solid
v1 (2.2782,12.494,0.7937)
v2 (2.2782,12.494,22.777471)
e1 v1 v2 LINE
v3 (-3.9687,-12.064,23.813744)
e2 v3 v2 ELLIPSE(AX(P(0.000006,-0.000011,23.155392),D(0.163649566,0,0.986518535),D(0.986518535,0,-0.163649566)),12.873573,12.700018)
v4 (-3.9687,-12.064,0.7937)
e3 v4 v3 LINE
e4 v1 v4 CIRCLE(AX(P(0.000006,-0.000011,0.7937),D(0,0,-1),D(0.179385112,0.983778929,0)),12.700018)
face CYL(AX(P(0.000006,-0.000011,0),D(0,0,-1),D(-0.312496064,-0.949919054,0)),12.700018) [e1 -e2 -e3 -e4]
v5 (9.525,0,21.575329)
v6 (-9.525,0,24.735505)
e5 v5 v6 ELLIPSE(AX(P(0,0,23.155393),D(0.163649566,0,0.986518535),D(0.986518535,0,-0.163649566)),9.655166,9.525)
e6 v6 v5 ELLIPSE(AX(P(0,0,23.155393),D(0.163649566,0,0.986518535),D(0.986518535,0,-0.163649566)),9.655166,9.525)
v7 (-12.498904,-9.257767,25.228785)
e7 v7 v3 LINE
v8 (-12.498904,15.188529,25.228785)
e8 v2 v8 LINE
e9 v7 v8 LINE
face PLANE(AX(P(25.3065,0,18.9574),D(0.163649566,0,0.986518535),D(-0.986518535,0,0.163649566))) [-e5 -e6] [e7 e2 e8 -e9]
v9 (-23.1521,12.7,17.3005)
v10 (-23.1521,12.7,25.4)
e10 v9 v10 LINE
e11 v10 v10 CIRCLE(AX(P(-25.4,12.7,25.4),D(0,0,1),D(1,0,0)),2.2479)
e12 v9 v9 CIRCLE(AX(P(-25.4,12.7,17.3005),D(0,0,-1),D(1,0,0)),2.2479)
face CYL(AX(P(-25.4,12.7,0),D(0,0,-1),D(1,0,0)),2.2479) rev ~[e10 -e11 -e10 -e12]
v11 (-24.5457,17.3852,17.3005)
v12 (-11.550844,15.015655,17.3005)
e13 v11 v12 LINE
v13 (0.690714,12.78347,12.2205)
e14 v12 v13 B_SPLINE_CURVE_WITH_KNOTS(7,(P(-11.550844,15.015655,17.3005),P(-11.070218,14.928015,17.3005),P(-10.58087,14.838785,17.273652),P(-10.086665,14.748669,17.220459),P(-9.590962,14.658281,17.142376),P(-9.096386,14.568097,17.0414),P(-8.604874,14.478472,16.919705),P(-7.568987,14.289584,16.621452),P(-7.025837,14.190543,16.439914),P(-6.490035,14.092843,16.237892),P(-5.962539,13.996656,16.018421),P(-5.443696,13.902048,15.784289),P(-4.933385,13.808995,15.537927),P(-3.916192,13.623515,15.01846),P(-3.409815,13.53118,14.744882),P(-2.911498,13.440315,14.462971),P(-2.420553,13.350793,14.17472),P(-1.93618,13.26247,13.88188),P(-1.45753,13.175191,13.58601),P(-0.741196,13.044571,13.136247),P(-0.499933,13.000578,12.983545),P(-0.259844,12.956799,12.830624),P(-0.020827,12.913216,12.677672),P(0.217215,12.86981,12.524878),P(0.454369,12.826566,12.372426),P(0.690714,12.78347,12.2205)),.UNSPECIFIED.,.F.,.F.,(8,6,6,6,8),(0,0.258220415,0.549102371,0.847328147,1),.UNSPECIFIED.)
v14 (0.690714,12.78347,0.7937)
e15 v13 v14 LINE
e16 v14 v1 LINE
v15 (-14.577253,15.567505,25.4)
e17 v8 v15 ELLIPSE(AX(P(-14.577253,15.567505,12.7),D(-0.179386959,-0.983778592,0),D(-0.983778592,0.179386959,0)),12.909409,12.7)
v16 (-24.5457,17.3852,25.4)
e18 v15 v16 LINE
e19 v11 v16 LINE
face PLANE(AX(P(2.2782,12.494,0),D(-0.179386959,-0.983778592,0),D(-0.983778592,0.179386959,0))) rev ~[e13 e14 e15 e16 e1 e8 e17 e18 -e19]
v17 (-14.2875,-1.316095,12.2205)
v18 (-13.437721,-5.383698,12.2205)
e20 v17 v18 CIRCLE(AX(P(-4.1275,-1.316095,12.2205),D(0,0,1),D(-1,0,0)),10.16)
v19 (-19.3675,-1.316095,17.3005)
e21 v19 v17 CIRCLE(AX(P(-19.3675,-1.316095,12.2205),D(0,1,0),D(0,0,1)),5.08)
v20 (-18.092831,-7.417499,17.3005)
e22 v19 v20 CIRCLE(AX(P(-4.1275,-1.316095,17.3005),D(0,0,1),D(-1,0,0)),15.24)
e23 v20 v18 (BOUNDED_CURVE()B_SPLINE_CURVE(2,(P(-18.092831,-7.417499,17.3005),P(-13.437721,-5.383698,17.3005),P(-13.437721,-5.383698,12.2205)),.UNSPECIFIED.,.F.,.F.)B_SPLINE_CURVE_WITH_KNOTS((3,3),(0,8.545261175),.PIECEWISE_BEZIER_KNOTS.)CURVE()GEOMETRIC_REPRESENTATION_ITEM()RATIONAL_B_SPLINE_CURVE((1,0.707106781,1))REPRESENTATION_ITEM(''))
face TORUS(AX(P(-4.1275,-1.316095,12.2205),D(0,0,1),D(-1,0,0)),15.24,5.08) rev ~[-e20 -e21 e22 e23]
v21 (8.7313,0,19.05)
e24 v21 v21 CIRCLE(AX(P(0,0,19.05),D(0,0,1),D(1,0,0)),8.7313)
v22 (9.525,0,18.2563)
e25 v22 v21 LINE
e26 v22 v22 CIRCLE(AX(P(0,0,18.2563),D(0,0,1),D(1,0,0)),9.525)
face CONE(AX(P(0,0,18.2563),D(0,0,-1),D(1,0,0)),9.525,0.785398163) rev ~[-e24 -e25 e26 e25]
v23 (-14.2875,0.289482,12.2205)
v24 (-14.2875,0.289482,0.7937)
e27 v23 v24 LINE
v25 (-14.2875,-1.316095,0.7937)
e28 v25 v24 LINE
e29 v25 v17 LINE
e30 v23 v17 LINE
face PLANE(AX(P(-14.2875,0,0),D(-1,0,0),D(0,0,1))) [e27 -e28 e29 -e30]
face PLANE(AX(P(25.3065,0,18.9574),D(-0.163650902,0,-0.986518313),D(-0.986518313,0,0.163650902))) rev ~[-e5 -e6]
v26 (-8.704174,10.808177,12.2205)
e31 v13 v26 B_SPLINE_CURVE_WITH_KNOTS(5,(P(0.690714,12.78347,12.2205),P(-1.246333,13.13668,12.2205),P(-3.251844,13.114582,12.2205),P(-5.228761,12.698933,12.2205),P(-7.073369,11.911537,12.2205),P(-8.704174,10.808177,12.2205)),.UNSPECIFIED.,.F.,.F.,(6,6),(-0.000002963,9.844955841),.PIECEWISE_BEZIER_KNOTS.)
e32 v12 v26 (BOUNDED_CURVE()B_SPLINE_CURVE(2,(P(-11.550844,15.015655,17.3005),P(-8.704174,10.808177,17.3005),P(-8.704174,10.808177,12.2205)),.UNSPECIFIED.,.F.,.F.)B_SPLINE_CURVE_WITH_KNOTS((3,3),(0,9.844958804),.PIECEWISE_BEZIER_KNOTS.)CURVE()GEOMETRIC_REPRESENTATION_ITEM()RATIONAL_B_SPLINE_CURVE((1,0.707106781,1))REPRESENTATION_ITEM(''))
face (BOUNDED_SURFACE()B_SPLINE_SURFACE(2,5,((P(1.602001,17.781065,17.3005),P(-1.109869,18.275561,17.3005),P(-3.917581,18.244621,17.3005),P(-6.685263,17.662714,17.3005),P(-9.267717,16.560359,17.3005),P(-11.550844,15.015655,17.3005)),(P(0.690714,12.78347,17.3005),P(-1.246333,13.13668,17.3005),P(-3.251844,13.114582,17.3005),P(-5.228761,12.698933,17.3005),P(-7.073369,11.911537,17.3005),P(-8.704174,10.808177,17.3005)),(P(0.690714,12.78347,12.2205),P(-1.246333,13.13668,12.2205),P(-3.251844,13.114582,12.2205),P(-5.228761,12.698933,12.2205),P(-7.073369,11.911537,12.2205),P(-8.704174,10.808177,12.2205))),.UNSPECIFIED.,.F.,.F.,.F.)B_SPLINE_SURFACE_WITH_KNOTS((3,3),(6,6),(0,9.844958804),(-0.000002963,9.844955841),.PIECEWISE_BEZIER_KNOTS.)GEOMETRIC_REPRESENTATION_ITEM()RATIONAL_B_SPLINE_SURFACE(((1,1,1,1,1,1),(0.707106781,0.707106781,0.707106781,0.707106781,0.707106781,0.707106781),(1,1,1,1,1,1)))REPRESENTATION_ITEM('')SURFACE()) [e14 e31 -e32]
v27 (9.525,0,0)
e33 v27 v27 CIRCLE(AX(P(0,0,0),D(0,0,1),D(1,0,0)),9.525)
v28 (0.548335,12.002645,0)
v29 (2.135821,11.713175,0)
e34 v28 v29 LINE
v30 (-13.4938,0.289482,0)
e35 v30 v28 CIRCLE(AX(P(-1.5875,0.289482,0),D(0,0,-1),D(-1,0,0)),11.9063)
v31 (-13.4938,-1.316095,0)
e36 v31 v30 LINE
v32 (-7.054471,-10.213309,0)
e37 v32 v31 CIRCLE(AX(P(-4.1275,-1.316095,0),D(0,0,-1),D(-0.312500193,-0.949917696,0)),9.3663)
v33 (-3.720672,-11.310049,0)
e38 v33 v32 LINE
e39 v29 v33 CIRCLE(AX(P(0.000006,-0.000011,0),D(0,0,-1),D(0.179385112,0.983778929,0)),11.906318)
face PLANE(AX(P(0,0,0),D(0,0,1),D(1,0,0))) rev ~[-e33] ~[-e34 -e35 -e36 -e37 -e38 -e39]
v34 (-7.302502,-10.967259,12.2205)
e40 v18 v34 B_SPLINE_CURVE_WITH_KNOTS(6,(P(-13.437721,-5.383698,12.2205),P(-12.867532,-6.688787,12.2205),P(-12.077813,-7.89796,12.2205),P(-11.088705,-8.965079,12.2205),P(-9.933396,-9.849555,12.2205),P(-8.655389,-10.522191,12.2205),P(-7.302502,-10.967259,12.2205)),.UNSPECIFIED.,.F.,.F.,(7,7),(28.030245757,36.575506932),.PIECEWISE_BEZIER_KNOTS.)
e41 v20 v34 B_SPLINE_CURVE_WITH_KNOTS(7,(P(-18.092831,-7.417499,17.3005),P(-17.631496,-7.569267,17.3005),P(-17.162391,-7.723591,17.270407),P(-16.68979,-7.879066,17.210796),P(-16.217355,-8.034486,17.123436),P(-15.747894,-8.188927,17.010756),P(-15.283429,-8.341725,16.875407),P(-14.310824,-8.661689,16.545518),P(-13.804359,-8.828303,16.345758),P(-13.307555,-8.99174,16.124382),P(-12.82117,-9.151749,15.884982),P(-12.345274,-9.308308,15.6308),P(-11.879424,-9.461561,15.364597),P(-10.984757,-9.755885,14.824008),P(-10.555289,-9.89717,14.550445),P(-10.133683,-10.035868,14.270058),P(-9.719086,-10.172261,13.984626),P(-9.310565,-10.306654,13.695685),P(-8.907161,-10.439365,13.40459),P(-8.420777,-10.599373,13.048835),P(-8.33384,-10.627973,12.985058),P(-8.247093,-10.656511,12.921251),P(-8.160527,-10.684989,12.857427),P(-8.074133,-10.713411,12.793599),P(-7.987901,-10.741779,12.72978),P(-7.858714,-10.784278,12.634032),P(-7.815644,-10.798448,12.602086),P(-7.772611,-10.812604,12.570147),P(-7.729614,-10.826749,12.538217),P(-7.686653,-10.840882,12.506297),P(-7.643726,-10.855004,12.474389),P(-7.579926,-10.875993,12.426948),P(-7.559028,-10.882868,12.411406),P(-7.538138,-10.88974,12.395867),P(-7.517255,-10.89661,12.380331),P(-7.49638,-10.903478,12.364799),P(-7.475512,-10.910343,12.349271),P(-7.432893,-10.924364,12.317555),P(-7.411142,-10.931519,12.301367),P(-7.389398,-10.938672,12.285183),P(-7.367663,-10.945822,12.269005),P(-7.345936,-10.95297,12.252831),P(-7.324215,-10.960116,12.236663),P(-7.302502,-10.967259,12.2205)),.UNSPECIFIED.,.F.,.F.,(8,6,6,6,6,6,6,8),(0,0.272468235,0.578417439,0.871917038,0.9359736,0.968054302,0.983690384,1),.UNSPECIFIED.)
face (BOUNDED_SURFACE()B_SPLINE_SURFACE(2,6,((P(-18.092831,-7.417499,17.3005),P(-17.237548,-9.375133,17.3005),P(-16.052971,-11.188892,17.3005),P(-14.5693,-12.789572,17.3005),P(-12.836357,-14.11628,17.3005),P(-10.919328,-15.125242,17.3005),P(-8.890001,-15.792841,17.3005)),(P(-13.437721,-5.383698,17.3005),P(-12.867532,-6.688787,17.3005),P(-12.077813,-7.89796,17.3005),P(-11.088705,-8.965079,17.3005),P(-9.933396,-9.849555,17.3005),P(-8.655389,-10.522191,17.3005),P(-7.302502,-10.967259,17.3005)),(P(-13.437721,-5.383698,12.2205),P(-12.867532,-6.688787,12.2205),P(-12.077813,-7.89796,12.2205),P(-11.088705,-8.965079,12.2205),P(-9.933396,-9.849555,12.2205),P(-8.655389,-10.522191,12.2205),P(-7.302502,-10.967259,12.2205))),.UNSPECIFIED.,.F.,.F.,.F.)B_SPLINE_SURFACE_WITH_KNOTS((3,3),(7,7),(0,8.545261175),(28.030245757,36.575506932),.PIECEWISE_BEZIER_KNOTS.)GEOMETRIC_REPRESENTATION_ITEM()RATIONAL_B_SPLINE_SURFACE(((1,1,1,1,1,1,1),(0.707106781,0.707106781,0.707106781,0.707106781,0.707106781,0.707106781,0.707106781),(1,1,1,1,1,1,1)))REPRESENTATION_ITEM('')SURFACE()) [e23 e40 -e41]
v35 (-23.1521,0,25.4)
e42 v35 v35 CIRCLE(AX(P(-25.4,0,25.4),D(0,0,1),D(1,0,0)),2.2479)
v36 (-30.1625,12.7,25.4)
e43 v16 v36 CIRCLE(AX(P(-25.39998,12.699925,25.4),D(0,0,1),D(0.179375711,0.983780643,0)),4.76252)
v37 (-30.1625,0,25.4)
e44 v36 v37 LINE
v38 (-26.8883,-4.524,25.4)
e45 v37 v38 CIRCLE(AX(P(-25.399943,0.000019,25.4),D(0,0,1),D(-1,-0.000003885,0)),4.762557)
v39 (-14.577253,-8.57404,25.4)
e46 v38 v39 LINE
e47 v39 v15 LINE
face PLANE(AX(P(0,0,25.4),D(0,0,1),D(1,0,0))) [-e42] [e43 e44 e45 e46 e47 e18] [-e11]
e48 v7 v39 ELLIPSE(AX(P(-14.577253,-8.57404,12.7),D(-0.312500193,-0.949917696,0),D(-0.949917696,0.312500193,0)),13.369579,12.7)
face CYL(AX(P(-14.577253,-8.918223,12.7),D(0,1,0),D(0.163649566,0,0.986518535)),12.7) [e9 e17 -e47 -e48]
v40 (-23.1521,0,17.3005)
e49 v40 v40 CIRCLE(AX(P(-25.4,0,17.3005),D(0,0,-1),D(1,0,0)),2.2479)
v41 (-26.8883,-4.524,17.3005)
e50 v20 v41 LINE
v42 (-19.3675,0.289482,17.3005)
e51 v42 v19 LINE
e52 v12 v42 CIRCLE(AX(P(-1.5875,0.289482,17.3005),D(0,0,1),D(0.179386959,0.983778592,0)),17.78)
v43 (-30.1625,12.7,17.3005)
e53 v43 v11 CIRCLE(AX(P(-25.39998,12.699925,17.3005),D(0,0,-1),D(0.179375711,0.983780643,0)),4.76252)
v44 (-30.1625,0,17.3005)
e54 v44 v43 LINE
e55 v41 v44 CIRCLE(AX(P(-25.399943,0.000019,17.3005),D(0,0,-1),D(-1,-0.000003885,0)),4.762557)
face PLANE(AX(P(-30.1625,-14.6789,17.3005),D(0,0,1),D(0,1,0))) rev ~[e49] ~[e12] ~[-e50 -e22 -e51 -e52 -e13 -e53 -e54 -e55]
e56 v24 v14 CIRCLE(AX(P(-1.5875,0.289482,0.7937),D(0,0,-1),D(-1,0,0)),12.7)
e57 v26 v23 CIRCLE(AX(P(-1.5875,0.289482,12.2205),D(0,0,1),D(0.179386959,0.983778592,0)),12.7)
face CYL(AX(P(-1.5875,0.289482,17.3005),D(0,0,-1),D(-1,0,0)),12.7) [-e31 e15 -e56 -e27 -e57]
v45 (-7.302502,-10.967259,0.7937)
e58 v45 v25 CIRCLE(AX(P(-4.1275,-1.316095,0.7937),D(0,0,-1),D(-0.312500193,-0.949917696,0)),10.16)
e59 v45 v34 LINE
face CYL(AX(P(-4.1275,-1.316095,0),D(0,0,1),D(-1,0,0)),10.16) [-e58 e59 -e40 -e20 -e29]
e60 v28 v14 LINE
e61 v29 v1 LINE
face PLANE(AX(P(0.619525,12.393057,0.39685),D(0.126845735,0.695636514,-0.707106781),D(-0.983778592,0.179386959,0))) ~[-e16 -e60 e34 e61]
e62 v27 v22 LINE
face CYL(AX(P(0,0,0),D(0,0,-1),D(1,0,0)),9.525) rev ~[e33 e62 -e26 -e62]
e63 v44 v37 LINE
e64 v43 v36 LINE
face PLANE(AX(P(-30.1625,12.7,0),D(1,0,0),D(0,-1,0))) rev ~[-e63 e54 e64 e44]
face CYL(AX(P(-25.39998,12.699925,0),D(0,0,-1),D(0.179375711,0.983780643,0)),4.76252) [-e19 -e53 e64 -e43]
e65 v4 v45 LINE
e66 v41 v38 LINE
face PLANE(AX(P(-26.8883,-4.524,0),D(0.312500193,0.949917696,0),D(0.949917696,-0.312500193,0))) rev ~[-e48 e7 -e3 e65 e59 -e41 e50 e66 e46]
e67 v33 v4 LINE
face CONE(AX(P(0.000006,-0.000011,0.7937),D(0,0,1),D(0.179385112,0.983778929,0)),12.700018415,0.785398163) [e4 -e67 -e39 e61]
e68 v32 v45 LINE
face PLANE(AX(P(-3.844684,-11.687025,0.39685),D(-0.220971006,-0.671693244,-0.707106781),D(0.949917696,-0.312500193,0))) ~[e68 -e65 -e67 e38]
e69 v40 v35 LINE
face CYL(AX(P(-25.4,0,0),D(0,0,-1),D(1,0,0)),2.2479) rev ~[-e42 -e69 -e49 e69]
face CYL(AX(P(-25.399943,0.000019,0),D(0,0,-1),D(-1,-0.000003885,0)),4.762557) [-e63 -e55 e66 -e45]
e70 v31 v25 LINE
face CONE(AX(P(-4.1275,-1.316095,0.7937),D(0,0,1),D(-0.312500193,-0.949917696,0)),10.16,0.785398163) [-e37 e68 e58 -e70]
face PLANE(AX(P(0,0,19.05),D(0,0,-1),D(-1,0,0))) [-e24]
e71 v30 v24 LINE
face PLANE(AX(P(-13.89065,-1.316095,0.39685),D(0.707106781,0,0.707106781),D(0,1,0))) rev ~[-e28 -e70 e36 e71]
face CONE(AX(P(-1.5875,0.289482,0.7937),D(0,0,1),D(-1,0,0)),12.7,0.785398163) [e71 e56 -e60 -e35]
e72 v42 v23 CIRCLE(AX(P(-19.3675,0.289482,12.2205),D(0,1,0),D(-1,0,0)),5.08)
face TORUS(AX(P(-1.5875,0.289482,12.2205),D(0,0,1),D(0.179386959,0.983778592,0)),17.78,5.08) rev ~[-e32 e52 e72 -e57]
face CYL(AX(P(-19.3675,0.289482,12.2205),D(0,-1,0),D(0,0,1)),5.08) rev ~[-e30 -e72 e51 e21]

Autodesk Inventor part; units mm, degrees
ref_plane "YZ Plane" through (0, 0, 0) normal (1, 0, 0) x (0, 1, 0)
ref_plane "XZ Plane" through (0, 0, 0) normal (0, 1, 0) x (-1, 0, 0)
sketch "Sketch1" plane through (0, 0, 0) normal (0, 0, 1) x (1, 0, 0)
  arc A0 (-3.9687, -12.064) -> (2.2782, 12.494) centre (0, 0) ccw
  circle A1 centre (-25.4, 0) radius 2.2479
  circle A2 centre (-25.4, 12.7) radius 2.2479
  line L0 (-25.4, 0) -> (-25.4, 12.7) construction
  line L1 (0, 0) -> (-25.4, 0) construction
  arc A3 (-24.5457, 17.3852) -> (-30.1625, 12.7) centre (-25.4, 12.7) ccw
  arc A4 (-30.1625, 0) -> (-26.8883, -4.524) centre (-25.4, 0) ccw
  line L2 (-26.8883, -4.524) -> (-3.9687, -12.064)
  line L3 (2.2782, 12.494) -> (-24.5457, 17.3852)
  line L4 (-30.1625, 12.7) -> (-30.1625, 0)
  circle A5 centre (0, 0) radius 9.525
  dimension "d0" = 25.4
  dimension "d1" = 12.7
  dimension "d2" = 4.4958
  dimension "d3" = 25.4
  dimension "d8" = 9.525
  dimension "d9" = 9.525
  dimension "d10" = 19.05
extrude "Extrusion1" add sketch "Sketch1" along normal blind 25.4
sketch "Sketch2" plane through (0, 0, 0) normal (0, 1, 0) x (-1, 0, 0)
  line L0 (-25.3065, 18.9574) -> (19.1186, 26.3269)
  line L1 (19.1186, 26.3269) -> (-25.6271, 26.3269)
  line L2 (-25.6271, 26.3269) -> (-25.3065, 18.9574)
  point P0 (0, 0)
extrude "Extrusion2" cut sketch "Sketch2" along normal through all both and the other way through all
fillet "Fillet1" radius 12.7 1 edges at (-13.531, 3.2293, 25.4)
ref_plane "Work Plane1" through (0, 0, 19.05) normal (0, 0, -1) x (-1, 0, 0)
sketch "Sketch4" plane through (-30.1625, 0, 0) normal (-1, 0, 0) x (0, 0, 1)
  line L0 (17.3005, 18.8893) -> (-1.1849, 18.8893)
  line L1 (-1.1849, 18.8893) -> (-1.1849, -14.6789)
  line L2 (-1.1849, -14.6789) -> (17.3005, -14.6789)
  line L3 (17.3005, -14.6789) -> (17.3005, 18.8893)
  point P0 (0, 0)
extrude "Extrusion4" cut sketch "Sketch4" against normal blind 15.875
fillet "Fillet2" radius 12.7 1 edges at (-14.2875, 15.5147, 8.6503)
fillet "Fillet3" radius 10.16 1 edges at (-14.2875, -8.6693, 8.6503)
fillet "Fillet4" radius 5.08 3 edges at (-12.358, -7.2729, 17.3005) (-9.7225, 10.042, 17.3005) (-14.2875, -0.5133, 17.3005)
sketch "Sketch6" plane through (0, 0, 19.05) normal (0, 0, -1) x (-1, 0, 0)
  circle A0 centre (0, 0) radius 9.525 projected
  arc A1 (7.3025, -10.9672) -> (14.2875, -1.3161) centre (4.1275, -1.3161) ccw projected
  line L0 (14.2875, -1.3161) -> (14.2875, 0.2895) projected
  arc A2 (14.2875, 0.2895) -> (-0.6907, 12.7835) centre (1.5875, 0.2895) ccw projected
  line L1 (-2.2782, 12.494) -> (-0.6907, 12.7835) projected
  arc A3 (-2.2782, 12.494) -> (3.9687, -12.064) centre (0, 0) ccw projected
  line L2 (7.3025, -10.9672) -> (3.9687, -12.064) projected
extrude "Extrusion6" add sketch "Sketch6" against normal up to surface contours A0 surface through (25.3065, 0, 18.9574) normal (-0.1636509, 0, -0.9865183)
chamfer "Chamfer1" distance 0.7937 angle 45 1 edges at (-9.525, 0, 19.05)
chamfer "Chamfer2" distance 0.7937 angle 45 6 edges at (-9.7225, 10.042, 0) (-14.2875, -0.5133, 0) (-12.358, -7.2729, 0) (-5.6356, -11.5156, 0) (12.308, -3.1309, 0) (1.4845, 12.6387, 0)
properties part number "thing" material "white pla"
